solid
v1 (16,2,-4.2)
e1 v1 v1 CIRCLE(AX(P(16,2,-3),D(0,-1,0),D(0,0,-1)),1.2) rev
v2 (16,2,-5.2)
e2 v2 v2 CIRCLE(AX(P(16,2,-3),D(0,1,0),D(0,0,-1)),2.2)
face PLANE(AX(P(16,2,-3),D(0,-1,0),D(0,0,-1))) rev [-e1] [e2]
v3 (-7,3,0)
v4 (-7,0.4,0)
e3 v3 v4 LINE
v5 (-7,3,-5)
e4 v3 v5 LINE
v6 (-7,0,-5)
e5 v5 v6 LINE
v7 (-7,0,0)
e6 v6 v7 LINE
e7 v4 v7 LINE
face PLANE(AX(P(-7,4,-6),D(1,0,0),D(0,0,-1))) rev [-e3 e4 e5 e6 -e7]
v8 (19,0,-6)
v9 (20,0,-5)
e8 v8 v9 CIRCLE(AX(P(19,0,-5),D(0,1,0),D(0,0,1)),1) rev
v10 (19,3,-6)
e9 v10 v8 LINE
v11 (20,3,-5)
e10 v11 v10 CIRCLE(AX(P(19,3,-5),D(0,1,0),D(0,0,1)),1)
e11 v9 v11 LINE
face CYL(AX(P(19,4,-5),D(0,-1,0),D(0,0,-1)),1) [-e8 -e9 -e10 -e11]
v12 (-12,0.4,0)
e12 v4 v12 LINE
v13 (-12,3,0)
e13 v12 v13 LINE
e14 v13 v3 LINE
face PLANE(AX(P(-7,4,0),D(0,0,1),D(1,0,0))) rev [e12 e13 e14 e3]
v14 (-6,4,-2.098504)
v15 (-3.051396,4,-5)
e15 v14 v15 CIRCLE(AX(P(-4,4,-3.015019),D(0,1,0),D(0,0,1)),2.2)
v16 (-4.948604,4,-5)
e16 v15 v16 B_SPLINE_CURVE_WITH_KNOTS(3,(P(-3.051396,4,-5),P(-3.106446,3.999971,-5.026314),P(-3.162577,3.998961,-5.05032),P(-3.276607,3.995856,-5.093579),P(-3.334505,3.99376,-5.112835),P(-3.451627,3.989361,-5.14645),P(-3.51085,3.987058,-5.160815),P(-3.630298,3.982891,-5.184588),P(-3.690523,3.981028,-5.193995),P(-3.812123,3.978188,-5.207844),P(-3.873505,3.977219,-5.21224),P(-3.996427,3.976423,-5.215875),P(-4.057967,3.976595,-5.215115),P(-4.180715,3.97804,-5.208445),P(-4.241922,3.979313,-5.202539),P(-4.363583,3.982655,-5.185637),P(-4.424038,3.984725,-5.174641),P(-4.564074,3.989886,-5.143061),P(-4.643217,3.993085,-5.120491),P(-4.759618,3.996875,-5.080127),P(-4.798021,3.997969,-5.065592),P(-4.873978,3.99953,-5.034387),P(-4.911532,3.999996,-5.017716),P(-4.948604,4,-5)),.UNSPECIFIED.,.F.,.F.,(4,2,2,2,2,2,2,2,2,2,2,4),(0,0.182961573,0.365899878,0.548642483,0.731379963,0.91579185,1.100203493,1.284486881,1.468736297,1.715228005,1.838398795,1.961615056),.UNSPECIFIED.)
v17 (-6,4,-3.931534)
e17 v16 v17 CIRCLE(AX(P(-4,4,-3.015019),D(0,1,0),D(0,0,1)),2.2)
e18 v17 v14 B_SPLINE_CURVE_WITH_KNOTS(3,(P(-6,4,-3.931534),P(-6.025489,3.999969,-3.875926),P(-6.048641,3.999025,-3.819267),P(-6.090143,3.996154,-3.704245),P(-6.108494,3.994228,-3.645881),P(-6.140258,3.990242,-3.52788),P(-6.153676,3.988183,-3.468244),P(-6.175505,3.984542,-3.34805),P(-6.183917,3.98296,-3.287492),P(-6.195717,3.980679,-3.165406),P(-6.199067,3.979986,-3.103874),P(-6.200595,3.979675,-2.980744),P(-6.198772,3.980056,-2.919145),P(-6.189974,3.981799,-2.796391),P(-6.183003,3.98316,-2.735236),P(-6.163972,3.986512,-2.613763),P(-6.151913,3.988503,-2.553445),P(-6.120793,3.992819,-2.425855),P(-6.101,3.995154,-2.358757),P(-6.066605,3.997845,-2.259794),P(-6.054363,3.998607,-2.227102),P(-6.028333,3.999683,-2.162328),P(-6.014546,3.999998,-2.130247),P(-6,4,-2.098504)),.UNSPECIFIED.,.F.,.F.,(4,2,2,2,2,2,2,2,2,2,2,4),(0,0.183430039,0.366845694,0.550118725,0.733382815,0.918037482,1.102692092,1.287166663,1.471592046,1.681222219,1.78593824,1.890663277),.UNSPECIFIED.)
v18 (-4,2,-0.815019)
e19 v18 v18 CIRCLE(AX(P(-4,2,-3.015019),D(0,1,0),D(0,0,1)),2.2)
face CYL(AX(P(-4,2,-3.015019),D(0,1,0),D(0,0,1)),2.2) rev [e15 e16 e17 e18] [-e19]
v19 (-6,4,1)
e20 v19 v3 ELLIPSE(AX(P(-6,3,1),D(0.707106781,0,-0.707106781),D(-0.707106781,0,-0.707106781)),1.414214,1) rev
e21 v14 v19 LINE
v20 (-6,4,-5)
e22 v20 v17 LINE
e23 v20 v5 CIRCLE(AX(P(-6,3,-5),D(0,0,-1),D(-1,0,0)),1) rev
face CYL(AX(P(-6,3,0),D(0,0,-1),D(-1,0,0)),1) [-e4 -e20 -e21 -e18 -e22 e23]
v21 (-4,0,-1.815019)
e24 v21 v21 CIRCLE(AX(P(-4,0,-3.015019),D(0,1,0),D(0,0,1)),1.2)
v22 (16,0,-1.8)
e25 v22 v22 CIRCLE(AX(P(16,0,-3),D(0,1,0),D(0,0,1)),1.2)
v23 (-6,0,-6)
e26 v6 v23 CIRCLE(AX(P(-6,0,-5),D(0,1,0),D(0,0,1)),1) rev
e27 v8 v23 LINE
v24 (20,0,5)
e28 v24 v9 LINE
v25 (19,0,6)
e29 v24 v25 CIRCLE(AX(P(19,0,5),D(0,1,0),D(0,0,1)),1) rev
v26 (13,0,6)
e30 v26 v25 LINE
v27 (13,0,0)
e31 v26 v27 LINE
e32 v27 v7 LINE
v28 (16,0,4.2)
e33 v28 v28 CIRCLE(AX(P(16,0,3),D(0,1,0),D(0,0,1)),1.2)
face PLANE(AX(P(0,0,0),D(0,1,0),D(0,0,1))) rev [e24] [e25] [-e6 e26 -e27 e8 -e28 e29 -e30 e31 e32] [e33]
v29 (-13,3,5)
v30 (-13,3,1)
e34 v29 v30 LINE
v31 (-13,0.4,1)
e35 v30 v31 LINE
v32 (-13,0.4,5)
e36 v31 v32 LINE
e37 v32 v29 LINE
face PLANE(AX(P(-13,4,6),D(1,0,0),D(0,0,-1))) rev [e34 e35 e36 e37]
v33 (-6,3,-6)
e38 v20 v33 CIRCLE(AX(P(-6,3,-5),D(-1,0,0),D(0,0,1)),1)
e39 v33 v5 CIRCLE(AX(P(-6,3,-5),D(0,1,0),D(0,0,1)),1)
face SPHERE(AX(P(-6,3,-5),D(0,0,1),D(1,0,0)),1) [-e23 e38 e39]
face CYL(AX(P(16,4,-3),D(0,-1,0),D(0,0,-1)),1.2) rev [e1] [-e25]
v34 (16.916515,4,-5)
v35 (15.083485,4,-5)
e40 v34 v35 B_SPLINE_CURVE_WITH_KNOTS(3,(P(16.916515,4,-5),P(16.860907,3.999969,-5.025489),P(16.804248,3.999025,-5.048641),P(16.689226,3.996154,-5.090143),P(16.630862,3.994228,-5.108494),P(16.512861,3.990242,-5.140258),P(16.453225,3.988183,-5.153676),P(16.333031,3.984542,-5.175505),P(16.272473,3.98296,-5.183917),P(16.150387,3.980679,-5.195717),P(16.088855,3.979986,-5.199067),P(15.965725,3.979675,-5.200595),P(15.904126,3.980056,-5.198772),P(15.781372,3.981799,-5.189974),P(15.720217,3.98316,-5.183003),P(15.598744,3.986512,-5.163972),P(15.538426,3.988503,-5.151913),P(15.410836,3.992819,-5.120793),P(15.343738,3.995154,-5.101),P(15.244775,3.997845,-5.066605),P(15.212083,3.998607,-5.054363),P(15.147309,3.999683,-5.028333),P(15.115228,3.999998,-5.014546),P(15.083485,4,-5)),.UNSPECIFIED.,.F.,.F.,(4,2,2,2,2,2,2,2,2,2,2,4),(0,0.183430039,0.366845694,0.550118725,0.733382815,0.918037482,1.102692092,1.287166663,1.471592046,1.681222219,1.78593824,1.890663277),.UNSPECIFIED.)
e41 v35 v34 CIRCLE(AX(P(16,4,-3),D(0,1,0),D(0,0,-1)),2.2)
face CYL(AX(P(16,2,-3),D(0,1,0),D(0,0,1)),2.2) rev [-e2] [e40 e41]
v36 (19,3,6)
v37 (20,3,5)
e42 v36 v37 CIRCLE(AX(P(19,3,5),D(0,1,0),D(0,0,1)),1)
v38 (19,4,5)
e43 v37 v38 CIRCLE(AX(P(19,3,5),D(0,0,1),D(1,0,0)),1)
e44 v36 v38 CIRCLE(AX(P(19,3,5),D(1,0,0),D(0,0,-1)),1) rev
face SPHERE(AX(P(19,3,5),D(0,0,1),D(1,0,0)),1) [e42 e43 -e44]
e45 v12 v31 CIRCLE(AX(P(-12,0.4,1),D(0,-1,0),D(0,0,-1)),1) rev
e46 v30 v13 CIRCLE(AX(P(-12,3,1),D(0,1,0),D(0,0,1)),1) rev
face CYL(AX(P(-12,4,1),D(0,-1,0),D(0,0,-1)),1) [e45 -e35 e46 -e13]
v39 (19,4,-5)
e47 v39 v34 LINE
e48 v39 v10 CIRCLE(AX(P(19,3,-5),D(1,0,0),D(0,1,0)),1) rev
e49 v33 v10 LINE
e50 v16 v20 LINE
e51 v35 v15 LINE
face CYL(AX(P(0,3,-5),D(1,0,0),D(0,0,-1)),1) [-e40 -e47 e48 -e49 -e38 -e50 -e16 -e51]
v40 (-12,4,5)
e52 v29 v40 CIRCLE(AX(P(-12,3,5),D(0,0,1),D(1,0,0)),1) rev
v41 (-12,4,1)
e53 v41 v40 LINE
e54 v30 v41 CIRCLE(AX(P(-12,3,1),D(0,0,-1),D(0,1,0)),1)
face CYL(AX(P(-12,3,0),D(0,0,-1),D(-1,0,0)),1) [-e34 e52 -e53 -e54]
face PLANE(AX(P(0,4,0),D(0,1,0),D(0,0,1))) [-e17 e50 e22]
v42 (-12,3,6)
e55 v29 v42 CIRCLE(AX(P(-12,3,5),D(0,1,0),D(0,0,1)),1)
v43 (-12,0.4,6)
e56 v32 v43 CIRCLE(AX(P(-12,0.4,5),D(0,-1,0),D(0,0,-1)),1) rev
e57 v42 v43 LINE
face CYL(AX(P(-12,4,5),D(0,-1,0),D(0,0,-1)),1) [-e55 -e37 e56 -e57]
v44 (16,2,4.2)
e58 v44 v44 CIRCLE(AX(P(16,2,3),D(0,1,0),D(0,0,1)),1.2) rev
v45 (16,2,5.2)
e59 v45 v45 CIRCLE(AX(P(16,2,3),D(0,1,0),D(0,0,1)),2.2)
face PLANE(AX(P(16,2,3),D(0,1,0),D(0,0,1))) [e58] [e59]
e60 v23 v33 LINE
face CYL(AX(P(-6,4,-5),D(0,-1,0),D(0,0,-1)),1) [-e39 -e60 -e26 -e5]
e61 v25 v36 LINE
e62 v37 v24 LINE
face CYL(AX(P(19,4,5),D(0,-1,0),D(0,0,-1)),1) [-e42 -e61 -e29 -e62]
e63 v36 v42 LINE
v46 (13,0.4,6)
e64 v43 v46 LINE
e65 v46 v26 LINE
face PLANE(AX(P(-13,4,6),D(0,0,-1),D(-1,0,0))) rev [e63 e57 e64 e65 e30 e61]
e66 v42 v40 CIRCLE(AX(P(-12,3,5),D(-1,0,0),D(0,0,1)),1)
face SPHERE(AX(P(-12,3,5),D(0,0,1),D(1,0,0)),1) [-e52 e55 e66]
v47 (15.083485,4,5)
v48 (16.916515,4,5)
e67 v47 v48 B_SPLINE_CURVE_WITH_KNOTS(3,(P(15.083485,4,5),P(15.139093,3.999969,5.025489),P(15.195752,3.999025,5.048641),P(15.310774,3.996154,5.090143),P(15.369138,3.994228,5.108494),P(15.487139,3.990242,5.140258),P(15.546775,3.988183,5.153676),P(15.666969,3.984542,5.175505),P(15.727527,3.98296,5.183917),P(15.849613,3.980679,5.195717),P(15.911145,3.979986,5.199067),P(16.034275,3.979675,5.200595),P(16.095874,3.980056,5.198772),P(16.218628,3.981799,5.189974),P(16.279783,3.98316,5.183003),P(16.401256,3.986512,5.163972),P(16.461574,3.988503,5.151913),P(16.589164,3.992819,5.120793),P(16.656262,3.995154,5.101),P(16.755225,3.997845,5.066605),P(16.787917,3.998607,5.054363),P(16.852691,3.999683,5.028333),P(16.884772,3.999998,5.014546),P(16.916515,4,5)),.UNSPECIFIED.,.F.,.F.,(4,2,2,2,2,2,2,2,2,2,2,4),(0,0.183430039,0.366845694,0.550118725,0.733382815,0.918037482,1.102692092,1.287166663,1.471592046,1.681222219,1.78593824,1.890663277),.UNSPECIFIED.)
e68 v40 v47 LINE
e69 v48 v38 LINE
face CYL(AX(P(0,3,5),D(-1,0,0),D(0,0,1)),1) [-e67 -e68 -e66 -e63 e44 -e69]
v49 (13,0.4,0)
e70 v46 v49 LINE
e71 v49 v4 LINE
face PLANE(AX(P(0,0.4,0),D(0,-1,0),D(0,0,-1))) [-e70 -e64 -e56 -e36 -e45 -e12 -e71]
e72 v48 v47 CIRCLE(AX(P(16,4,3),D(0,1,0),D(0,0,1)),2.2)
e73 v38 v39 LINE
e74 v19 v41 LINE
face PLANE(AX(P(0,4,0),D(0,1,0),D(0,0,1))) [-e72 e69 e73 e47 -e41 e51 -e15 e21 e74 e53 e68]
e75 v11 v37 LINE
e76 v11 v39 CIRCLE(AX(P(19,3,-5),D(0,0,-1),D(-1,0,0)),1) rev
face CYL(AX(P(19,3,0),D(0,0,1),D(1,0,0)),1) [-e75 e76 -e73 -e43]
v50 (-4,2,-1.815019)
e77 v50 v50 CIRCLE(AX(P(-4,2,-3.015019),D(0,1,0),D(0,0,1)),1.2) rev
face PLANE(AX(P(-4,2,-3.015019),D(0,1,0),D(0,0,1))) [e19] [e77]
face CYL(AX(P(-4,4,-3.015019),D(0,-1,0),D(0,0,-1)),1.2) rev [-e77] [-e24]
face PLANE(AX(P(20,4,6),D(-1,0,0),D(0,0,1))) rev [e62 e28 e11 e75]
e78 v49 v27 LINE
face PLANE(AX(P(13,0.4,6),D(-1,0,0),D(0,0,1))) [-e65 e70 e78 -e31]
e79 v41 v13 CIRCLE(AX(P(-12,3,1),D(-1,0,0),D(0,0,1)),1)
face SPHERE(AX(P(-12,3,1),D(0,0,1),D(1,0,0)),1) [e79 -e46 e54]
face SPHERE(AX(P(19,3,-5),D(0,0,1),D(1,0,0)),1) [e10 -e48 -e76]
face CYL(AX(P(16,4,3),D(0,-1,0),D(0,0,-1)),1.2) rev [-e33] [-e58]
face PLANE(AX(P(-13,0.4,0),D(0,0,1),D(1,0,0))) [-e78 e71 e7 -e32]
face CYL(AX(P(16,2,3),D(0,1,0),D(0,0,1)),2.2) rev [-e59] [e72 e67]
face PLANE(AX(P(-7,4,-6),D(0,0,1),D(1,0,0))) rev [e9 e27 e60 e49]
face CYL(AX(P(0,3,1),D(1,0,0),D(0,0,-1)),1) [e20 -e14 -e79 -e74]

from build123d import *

# Parameters (mm, degrees)
EXTRUDE_1_DEPTH     = 4
CUT_EXTRUDE_START   = 4
SKETCH_2_R          = 2.2
CUT_EXTRUDE_2_DEPTH = 2
SKETCH_3_R          = 2.2
CUT_EXTRUDE_3_DEPTH = 2
SKETCH_4_R          = 1.2
CUT_EXTRUDE_4_DEPTH = 22.260291625
SKETCH_5_R          = 1.2
CUT_EXTRUDE_5_DEPTH = 22.260291625
FILLET_1_R          = 1
SKETCH_6_W          = 26
SKETCH_6_H          = 6
CUT_EXTRUDE_8_DEPTH = 0.4


with BuildPart() as part:
    # 草圖1 → 填料-伸長1 (new body)
    with BuildSketch(Plane(origin=(0, 0, 0), x_dir=(1, 0, 0), z_dir=(0, 1, 0))):
        Polygon((-13, -6), (20, -6), (20, 6), (-7, 6), (-7, 0), (-13, 0), align=None)
    extrude(amount=EXTRUDE_1_DEPTH)

    # 草圖2 → 除料-伸長2 (cut)
    with BuildSketch(Plane(origin=(0, 0, 0), x_dir=(1, 0, 0), z_dir=(0, 1, 0)).offset(CUT_EXTRUDE_START)):
        with Locations(Location((-4, 3.015018989, 0), (0, 0, 270))):
            Circle(SKETCH_2_R)
    extrude(amount=-CUT_EXTRUDE_2_DEPTH, mode=Mode.SUBTRACT)

    # 草圖3 → 除料-伸長3 (cut)
    with BuildSketch(Plane(origin=(0, 0, 0), x_dir=(1, 0, 0), z_dir=(0, 1, 0)).offset(CUT_EXTRUDE_START)):
        with Locations(Location((16, -3, 0), (0, 0, 270))):
            Circle(SKETCH_3_R)
        with Locations(Location((16, 3, 0), (0, 0, 90))):
            Circle(SKETCH_3_R)
    extrude(amount=-CUT_EXTRUDE_3_DEPTH, mode=Mode.SUBTRACT)

    # 草圖4 → 除料-伸長4 (cut, through all)
    with BuildSketch(Plane(origin=(0, 0, 0), x_dir=(1, 0, 0), z_dir=(0, 1, 0))):
        with Locations(Location((-4, 3.015018989, 0), (0, 0, 270))):
            Circle(SKETCH_4_R)
        with Locations(Location((16, -3, 0), (0, 0, 270))):
            Circle(SKETCH_4_R)
    extrude(amount=CUT_EXTRUDE_4_DEPTH, mode=Mode.SUBTRACT)

    # 草圖5 → 除料-伸長5 (cut, through all)
    with BuildSketch(Plane(origin=(0, 0, 0), x_dir=(1, 0, 0), z_dir=(0, 1, 0))):
        with Locations(Location((16, 3, 0), (0, 0, 90))):
            Circle(SKETCH_5_R)
    extrude(amount=CUT_EXTRUDE_5_DEPTH, mode=Mode.SUBTRACT)

    # 圓角1
    # the kernel refuses this fillet: 1 mm, written as the material it takes off along each edge
    with BuildSketch(Plane(origin=(19, 3, 5), x_dir=(1, 0, 0), z_dir=(0, 0, 1))) as fillet_1_piece_1_section:
        Polygon((0, 0), (FILLET_1_R, 0), (FILLET_1_R, FILLET_1_R), (0, FILLET_1_R), align=None)
    fillet_1_piece_1 = extrude(amount=FILLET_1_R, mode=Mode.PRIVATE)
    fillet_1_piece_1 = fillet_1_piece_1 - Plane(origin=(19, 3, 5), x_dir=(-0.7071067811865475, -0.7071067811865475, 0), z_dir=(0, 0, 1)) * Sphere(FILLET_1_R, mode=Mode.PRIVATE)
    add(fillet_1_piece_1, mode=Mode.SUBTRACT)
    with BuildSketch(Plane(origin=(19, 3, -5), x_dir=(0, 1, 0), z_dir=(1, 0, 0))) as fillet_1_piece_2_section:
        Polygon((0, 0), (FILLET_1_R, 0), (FILLET_1_R, -FILLET_1_R), (0, -FILLET_1_R), align=None)
    fillet_1_piece_2 = extrude(amount=FILLET_1_R, mode=Mode.PRIVATE)
    fillet_1_piece_2 = fillet_1_piece_2 - Plane(origin=(19, 3, -5), x_dir=(0, -0.7071067811865475, 0.7071067811865475), z_dir=(1, 0, 0)) * Sphere(FILLET_1_R, mode=Mode.PRIVATE)
    add(fillet_1_piece_2, mode=Mode.SUBTRACT)
    with BuildSketch(Plane(origin=(-12, 3, 1), x_dir=(0, 1, 0), z_dir=(-1, 0, 0))) as fillet_1_piece_3_section:
        Polygon((0, 0), (FILLET_1_R, 0), (FILLET_1_R, FILLET_1_R), (0, FILLET_1_R), align=None)
    fillet_1_piece_3 = extrude(amount=FILLET_1_R, mode=Mode.PRIVATE)
    fillet_1_piece_3 = fillet_1_piece_3 - Plane(origin=(-12, 3, 1), x_dir=(0, -0.7071067811865475, 0.7071067811865475), z_dir=(-1, 0, 0)) * Sphere(FILLET_1_R, mode=Mode.PRIVATE)
    add(fillet_1_piece_3, mode=Mode.SUBTRACT)
    with BuildSketch(Plane(origin=(-6, 3, -5), x_dir=(0, 0, -1), z_dir=(0, 1, 0))) as fillet_1_piece_4_section:
        Polygon((0, 0), (FILLET_1_R, 0), (FILLET_1_R, FILLET_1_R), (0, FILLET_1_R), align=None)
    fillet_1_piece_4 = extrude(amount=FILLET_1_R, mode=Mode.PRIVATE)
    fillet_1_piece_4 = fillet_1_piece_4 - Plane(origin=(-6, 3, -5), x_dir=(0.7071067811865475, 0, 0.7071067811865477), z_dir=(0, 1, 0)) * Sphere(FILLET_1_R, mode=Mode.PRIVATE)
    add(fillet_1_piece_4, mode=Mode.SUBTRACT)
    with BuildSketch(Plane(origin=(-12, 3, 5), x_dir=(-1, 0, 0), z_dir=(0, 0, 1))) as fillet_1_piece_5_section:
        Polygon((0, 0), (FILLET_1_R, 0), (FILLET_1_R, -FILLET_1_R), (0, -FILLET_1_R), align=None)
    fillet_1_piece_5 = extrude(amount=FILLET_1_R, mode=Mode.PRIVATE)
    fillet_1_piece_5 = fillet_1_piece_5 - Plane(origin=(-12, 3, 5), x_dir=(0.7071067811865475, -0.7071067811865475, 0), z_dir=(0, 0, 1)) * Sphere(FILLET_1_R, mode=Mode.PRIVATE)
    add(fillet_1_piece_5, mode=Mode.SUBTRACT)
    with BuildSketch(Plane(origin=(20, 4, 5), x_dir=(0, -1, 0), z_dir=(0, 0, -1))) as fillet_1_piece_6:
        with BuildLine():
            CenterArc((FILLET_1_R, FILLET_1_R), FILLET_1_R, 180, 90)
            Line((0, FILLET_1_R), (0, 0))
            Line((0, 0), (FILLET_1_R, 0))
        make_face()
    extrude(amount=10, mode=Mode.SUBTRACT)
    with BuildSketch(Plane(origin=(-13, -2.5, 0), x_dir=(0, 0, 1), z_dir=(0, 1, 0)), Plane(origin=(-13, -2.5, 6), x_dir=(1, 0, 0), z_dir=(0, 1, 0))) as fillet_1_piece_7:
        with BuildLine():
            CenterArc((FILLET_1_R, FILLET_1_R), FILLET_1_R, 180, 90)
            Line((0, FILLET_1_R), (0, 0))
            Line((0, 0), (FILLET_1_R, 0))
        make_face()
    extrude(amount=5.5, mode=Mode.SUBTRACT)
    with BuildSketch(Plane(origin=(-7, -2.5, -6), x_dir=(1, 0, 0), z_dir=(0, 1, 0)), Plane(origin=(20, -2.5, -6), x_dir=(0, 0, 1), z_dir=(0, 1, 0)), Plane(origin=(20, -2.5, 6), x_dir=(-1, 0, 0), z_dir=(0, 1, 0))) as fillet_1_piece_8:
        with BuildLine():
            CenterArc((FILLET_1_R, -FILLET_1_R), FILLET_1_R, 90, 90)
            Line((0, -FILLET_1_R), (0, 0))
            Line((0, 0), (FILLET_1_R, 0))
        make_face()
    extrude(amount=5.5, mode=Mode.SUBTRACT)
    with BuildSketch(Plane(origin=(19, 4, -6), x_dir=(0, 0, 1), z_dir=(-1, 0, 0))) as fillet_1_piece_9:
        with BuildLine():
            CenterArc((FILLET_1_R, -FILLET_1_R), FILLET_1_R, 90, 90)
            Line((0, -FILLET_1_R), (0, 0))
            Line((0, 0), (FILLET_1_R, 0))
        make_face()
    extrude(amount=25, mode=Mode.SUBTRACT)
    with BuildSketch(Plane(origin=(-7, 4, -5), x_dir=(1, 0, 0), z_dir=(0, 0, 1)), Plane(origin=(-7, 4, 0), x_dir=(0, 0, 1), z_dir=(-1, 0, 0))) as fillet_1_piece_10:
        with BuildLine():
            CenterArc((FILLET_1_R, -FILLET_1_R), FILLET_1_R, 90, 90)
            Line((0, -FILLET_1_R), (0, 0))
            Line((0, 0), (FILLET_1_R, 0))
        make_face()
    extrude(amount=5, mode=Mode.SUBTRACT)
    with BuildSketch(Plane(origin=(-13, 4, 1), x_dir=(0, -1, 0), z_dir=(0, 0, 1))) as fillet_1_piece_11:
        with BuildLine():
            CenterArc((FILLET_1_R, FILLET_1_R), FILLET_1_R, 180, 90)
            Line((0, FILLET_1_R), (0, 0))
            Line((0, 0), (FILLET_1_R, 0))
        make_face()
    extrude(amount=4, mode=Mode.SUBTRACT)
    with BuildSketch(Plane(origin=(-12, 4, 6), x_dir=(0, -1, 0), z_dir=(1, 0, 0))) as fillet_1_piece_12:
        with BuildLine():
            CenterArc((FILLET_1_R, FILLET_1_R), FILLET_1_R, 180, 90)
            Line((0, FILLET_1_R), (0, 0))
            Line((0, 0), (FILLET_1_R, 0))
        make_face()
    extrude(amount=31, mode=Mode.SUBTRACT)
    with BuildSketch(Plane(origin=(-4.5, 4, 0), x_dir=(0, 0, 1), z_dir=(-1, 0, 0))) as fillet_1_piece_13a_section:
        with BuildLine():
            CenterArc((FILLET_1_R, -FILLET_1_R), FILLET_1_R, 90, 90)
            Line((0, -FILLET_1_R), (0, 0))
            Line((0, 0), (FILLET_1_R, 0))
        make_face()
    fillet_1_piece_13a = extrude(amount=7.5, mode=Mode.PRIVATE)
    fillet_1_piece_13a = split(fillet_1_piece_13a, bisect_by=Plane(origin=(-7, 3.773604886, 0.226395114), z_dir=(1, 0, 0)), keep=Keep.TOP, mode=Mode.PRIVATE)
    with BuildSketch(Plane(origin=(-7, 4, -5), x_dir=(1, 0, 0), z_dir=(0, 0, 1))) as fillet_1_piece_13b_section:
        with BuildLine():
            CenterArc((FILLET_1_R, -FILLET_1_R), FILLET_1_R, 90, 90)
            Line((0, -FILLET_1_R), (0, 0))
            Line((0, 0), (FILLET_1_R, 0))
        make_face()
    fillet_1_piece_13b = extrude(amount=7.5, mode=Mode.PRIVATE)
    fillet_1_piece_13b = split(fillet_1_piece_13b, bisect_by=Plane(origin=(-6.773604886, 3.773604886, 0), z_dir=(0, 0, 1)), keep=Keep.TOP, mode=Mode.PRIVATE)
    fillet_1_piece_13 = fillet_1_piece_13a & fillet_1_piece_13b
    add(fillet_1_piece_13, mode=Mode.SUBTRACT)

    # 草圖6 → 除料-伸長8 (cut)
    with BuildSketch(Plane(origin=(0, 0, 0), x_dir=(1, 0, 0), z_dir=(0, 1, 0))):
        with Locations((0, -3)):
            Rectangle(SKETCH_6_W, SKETCH_6_H)
    extrude(amount=CUT_EXTRUDE_8_DEPTH, mode=Mode.SUBTRACT)


solid = part.part
